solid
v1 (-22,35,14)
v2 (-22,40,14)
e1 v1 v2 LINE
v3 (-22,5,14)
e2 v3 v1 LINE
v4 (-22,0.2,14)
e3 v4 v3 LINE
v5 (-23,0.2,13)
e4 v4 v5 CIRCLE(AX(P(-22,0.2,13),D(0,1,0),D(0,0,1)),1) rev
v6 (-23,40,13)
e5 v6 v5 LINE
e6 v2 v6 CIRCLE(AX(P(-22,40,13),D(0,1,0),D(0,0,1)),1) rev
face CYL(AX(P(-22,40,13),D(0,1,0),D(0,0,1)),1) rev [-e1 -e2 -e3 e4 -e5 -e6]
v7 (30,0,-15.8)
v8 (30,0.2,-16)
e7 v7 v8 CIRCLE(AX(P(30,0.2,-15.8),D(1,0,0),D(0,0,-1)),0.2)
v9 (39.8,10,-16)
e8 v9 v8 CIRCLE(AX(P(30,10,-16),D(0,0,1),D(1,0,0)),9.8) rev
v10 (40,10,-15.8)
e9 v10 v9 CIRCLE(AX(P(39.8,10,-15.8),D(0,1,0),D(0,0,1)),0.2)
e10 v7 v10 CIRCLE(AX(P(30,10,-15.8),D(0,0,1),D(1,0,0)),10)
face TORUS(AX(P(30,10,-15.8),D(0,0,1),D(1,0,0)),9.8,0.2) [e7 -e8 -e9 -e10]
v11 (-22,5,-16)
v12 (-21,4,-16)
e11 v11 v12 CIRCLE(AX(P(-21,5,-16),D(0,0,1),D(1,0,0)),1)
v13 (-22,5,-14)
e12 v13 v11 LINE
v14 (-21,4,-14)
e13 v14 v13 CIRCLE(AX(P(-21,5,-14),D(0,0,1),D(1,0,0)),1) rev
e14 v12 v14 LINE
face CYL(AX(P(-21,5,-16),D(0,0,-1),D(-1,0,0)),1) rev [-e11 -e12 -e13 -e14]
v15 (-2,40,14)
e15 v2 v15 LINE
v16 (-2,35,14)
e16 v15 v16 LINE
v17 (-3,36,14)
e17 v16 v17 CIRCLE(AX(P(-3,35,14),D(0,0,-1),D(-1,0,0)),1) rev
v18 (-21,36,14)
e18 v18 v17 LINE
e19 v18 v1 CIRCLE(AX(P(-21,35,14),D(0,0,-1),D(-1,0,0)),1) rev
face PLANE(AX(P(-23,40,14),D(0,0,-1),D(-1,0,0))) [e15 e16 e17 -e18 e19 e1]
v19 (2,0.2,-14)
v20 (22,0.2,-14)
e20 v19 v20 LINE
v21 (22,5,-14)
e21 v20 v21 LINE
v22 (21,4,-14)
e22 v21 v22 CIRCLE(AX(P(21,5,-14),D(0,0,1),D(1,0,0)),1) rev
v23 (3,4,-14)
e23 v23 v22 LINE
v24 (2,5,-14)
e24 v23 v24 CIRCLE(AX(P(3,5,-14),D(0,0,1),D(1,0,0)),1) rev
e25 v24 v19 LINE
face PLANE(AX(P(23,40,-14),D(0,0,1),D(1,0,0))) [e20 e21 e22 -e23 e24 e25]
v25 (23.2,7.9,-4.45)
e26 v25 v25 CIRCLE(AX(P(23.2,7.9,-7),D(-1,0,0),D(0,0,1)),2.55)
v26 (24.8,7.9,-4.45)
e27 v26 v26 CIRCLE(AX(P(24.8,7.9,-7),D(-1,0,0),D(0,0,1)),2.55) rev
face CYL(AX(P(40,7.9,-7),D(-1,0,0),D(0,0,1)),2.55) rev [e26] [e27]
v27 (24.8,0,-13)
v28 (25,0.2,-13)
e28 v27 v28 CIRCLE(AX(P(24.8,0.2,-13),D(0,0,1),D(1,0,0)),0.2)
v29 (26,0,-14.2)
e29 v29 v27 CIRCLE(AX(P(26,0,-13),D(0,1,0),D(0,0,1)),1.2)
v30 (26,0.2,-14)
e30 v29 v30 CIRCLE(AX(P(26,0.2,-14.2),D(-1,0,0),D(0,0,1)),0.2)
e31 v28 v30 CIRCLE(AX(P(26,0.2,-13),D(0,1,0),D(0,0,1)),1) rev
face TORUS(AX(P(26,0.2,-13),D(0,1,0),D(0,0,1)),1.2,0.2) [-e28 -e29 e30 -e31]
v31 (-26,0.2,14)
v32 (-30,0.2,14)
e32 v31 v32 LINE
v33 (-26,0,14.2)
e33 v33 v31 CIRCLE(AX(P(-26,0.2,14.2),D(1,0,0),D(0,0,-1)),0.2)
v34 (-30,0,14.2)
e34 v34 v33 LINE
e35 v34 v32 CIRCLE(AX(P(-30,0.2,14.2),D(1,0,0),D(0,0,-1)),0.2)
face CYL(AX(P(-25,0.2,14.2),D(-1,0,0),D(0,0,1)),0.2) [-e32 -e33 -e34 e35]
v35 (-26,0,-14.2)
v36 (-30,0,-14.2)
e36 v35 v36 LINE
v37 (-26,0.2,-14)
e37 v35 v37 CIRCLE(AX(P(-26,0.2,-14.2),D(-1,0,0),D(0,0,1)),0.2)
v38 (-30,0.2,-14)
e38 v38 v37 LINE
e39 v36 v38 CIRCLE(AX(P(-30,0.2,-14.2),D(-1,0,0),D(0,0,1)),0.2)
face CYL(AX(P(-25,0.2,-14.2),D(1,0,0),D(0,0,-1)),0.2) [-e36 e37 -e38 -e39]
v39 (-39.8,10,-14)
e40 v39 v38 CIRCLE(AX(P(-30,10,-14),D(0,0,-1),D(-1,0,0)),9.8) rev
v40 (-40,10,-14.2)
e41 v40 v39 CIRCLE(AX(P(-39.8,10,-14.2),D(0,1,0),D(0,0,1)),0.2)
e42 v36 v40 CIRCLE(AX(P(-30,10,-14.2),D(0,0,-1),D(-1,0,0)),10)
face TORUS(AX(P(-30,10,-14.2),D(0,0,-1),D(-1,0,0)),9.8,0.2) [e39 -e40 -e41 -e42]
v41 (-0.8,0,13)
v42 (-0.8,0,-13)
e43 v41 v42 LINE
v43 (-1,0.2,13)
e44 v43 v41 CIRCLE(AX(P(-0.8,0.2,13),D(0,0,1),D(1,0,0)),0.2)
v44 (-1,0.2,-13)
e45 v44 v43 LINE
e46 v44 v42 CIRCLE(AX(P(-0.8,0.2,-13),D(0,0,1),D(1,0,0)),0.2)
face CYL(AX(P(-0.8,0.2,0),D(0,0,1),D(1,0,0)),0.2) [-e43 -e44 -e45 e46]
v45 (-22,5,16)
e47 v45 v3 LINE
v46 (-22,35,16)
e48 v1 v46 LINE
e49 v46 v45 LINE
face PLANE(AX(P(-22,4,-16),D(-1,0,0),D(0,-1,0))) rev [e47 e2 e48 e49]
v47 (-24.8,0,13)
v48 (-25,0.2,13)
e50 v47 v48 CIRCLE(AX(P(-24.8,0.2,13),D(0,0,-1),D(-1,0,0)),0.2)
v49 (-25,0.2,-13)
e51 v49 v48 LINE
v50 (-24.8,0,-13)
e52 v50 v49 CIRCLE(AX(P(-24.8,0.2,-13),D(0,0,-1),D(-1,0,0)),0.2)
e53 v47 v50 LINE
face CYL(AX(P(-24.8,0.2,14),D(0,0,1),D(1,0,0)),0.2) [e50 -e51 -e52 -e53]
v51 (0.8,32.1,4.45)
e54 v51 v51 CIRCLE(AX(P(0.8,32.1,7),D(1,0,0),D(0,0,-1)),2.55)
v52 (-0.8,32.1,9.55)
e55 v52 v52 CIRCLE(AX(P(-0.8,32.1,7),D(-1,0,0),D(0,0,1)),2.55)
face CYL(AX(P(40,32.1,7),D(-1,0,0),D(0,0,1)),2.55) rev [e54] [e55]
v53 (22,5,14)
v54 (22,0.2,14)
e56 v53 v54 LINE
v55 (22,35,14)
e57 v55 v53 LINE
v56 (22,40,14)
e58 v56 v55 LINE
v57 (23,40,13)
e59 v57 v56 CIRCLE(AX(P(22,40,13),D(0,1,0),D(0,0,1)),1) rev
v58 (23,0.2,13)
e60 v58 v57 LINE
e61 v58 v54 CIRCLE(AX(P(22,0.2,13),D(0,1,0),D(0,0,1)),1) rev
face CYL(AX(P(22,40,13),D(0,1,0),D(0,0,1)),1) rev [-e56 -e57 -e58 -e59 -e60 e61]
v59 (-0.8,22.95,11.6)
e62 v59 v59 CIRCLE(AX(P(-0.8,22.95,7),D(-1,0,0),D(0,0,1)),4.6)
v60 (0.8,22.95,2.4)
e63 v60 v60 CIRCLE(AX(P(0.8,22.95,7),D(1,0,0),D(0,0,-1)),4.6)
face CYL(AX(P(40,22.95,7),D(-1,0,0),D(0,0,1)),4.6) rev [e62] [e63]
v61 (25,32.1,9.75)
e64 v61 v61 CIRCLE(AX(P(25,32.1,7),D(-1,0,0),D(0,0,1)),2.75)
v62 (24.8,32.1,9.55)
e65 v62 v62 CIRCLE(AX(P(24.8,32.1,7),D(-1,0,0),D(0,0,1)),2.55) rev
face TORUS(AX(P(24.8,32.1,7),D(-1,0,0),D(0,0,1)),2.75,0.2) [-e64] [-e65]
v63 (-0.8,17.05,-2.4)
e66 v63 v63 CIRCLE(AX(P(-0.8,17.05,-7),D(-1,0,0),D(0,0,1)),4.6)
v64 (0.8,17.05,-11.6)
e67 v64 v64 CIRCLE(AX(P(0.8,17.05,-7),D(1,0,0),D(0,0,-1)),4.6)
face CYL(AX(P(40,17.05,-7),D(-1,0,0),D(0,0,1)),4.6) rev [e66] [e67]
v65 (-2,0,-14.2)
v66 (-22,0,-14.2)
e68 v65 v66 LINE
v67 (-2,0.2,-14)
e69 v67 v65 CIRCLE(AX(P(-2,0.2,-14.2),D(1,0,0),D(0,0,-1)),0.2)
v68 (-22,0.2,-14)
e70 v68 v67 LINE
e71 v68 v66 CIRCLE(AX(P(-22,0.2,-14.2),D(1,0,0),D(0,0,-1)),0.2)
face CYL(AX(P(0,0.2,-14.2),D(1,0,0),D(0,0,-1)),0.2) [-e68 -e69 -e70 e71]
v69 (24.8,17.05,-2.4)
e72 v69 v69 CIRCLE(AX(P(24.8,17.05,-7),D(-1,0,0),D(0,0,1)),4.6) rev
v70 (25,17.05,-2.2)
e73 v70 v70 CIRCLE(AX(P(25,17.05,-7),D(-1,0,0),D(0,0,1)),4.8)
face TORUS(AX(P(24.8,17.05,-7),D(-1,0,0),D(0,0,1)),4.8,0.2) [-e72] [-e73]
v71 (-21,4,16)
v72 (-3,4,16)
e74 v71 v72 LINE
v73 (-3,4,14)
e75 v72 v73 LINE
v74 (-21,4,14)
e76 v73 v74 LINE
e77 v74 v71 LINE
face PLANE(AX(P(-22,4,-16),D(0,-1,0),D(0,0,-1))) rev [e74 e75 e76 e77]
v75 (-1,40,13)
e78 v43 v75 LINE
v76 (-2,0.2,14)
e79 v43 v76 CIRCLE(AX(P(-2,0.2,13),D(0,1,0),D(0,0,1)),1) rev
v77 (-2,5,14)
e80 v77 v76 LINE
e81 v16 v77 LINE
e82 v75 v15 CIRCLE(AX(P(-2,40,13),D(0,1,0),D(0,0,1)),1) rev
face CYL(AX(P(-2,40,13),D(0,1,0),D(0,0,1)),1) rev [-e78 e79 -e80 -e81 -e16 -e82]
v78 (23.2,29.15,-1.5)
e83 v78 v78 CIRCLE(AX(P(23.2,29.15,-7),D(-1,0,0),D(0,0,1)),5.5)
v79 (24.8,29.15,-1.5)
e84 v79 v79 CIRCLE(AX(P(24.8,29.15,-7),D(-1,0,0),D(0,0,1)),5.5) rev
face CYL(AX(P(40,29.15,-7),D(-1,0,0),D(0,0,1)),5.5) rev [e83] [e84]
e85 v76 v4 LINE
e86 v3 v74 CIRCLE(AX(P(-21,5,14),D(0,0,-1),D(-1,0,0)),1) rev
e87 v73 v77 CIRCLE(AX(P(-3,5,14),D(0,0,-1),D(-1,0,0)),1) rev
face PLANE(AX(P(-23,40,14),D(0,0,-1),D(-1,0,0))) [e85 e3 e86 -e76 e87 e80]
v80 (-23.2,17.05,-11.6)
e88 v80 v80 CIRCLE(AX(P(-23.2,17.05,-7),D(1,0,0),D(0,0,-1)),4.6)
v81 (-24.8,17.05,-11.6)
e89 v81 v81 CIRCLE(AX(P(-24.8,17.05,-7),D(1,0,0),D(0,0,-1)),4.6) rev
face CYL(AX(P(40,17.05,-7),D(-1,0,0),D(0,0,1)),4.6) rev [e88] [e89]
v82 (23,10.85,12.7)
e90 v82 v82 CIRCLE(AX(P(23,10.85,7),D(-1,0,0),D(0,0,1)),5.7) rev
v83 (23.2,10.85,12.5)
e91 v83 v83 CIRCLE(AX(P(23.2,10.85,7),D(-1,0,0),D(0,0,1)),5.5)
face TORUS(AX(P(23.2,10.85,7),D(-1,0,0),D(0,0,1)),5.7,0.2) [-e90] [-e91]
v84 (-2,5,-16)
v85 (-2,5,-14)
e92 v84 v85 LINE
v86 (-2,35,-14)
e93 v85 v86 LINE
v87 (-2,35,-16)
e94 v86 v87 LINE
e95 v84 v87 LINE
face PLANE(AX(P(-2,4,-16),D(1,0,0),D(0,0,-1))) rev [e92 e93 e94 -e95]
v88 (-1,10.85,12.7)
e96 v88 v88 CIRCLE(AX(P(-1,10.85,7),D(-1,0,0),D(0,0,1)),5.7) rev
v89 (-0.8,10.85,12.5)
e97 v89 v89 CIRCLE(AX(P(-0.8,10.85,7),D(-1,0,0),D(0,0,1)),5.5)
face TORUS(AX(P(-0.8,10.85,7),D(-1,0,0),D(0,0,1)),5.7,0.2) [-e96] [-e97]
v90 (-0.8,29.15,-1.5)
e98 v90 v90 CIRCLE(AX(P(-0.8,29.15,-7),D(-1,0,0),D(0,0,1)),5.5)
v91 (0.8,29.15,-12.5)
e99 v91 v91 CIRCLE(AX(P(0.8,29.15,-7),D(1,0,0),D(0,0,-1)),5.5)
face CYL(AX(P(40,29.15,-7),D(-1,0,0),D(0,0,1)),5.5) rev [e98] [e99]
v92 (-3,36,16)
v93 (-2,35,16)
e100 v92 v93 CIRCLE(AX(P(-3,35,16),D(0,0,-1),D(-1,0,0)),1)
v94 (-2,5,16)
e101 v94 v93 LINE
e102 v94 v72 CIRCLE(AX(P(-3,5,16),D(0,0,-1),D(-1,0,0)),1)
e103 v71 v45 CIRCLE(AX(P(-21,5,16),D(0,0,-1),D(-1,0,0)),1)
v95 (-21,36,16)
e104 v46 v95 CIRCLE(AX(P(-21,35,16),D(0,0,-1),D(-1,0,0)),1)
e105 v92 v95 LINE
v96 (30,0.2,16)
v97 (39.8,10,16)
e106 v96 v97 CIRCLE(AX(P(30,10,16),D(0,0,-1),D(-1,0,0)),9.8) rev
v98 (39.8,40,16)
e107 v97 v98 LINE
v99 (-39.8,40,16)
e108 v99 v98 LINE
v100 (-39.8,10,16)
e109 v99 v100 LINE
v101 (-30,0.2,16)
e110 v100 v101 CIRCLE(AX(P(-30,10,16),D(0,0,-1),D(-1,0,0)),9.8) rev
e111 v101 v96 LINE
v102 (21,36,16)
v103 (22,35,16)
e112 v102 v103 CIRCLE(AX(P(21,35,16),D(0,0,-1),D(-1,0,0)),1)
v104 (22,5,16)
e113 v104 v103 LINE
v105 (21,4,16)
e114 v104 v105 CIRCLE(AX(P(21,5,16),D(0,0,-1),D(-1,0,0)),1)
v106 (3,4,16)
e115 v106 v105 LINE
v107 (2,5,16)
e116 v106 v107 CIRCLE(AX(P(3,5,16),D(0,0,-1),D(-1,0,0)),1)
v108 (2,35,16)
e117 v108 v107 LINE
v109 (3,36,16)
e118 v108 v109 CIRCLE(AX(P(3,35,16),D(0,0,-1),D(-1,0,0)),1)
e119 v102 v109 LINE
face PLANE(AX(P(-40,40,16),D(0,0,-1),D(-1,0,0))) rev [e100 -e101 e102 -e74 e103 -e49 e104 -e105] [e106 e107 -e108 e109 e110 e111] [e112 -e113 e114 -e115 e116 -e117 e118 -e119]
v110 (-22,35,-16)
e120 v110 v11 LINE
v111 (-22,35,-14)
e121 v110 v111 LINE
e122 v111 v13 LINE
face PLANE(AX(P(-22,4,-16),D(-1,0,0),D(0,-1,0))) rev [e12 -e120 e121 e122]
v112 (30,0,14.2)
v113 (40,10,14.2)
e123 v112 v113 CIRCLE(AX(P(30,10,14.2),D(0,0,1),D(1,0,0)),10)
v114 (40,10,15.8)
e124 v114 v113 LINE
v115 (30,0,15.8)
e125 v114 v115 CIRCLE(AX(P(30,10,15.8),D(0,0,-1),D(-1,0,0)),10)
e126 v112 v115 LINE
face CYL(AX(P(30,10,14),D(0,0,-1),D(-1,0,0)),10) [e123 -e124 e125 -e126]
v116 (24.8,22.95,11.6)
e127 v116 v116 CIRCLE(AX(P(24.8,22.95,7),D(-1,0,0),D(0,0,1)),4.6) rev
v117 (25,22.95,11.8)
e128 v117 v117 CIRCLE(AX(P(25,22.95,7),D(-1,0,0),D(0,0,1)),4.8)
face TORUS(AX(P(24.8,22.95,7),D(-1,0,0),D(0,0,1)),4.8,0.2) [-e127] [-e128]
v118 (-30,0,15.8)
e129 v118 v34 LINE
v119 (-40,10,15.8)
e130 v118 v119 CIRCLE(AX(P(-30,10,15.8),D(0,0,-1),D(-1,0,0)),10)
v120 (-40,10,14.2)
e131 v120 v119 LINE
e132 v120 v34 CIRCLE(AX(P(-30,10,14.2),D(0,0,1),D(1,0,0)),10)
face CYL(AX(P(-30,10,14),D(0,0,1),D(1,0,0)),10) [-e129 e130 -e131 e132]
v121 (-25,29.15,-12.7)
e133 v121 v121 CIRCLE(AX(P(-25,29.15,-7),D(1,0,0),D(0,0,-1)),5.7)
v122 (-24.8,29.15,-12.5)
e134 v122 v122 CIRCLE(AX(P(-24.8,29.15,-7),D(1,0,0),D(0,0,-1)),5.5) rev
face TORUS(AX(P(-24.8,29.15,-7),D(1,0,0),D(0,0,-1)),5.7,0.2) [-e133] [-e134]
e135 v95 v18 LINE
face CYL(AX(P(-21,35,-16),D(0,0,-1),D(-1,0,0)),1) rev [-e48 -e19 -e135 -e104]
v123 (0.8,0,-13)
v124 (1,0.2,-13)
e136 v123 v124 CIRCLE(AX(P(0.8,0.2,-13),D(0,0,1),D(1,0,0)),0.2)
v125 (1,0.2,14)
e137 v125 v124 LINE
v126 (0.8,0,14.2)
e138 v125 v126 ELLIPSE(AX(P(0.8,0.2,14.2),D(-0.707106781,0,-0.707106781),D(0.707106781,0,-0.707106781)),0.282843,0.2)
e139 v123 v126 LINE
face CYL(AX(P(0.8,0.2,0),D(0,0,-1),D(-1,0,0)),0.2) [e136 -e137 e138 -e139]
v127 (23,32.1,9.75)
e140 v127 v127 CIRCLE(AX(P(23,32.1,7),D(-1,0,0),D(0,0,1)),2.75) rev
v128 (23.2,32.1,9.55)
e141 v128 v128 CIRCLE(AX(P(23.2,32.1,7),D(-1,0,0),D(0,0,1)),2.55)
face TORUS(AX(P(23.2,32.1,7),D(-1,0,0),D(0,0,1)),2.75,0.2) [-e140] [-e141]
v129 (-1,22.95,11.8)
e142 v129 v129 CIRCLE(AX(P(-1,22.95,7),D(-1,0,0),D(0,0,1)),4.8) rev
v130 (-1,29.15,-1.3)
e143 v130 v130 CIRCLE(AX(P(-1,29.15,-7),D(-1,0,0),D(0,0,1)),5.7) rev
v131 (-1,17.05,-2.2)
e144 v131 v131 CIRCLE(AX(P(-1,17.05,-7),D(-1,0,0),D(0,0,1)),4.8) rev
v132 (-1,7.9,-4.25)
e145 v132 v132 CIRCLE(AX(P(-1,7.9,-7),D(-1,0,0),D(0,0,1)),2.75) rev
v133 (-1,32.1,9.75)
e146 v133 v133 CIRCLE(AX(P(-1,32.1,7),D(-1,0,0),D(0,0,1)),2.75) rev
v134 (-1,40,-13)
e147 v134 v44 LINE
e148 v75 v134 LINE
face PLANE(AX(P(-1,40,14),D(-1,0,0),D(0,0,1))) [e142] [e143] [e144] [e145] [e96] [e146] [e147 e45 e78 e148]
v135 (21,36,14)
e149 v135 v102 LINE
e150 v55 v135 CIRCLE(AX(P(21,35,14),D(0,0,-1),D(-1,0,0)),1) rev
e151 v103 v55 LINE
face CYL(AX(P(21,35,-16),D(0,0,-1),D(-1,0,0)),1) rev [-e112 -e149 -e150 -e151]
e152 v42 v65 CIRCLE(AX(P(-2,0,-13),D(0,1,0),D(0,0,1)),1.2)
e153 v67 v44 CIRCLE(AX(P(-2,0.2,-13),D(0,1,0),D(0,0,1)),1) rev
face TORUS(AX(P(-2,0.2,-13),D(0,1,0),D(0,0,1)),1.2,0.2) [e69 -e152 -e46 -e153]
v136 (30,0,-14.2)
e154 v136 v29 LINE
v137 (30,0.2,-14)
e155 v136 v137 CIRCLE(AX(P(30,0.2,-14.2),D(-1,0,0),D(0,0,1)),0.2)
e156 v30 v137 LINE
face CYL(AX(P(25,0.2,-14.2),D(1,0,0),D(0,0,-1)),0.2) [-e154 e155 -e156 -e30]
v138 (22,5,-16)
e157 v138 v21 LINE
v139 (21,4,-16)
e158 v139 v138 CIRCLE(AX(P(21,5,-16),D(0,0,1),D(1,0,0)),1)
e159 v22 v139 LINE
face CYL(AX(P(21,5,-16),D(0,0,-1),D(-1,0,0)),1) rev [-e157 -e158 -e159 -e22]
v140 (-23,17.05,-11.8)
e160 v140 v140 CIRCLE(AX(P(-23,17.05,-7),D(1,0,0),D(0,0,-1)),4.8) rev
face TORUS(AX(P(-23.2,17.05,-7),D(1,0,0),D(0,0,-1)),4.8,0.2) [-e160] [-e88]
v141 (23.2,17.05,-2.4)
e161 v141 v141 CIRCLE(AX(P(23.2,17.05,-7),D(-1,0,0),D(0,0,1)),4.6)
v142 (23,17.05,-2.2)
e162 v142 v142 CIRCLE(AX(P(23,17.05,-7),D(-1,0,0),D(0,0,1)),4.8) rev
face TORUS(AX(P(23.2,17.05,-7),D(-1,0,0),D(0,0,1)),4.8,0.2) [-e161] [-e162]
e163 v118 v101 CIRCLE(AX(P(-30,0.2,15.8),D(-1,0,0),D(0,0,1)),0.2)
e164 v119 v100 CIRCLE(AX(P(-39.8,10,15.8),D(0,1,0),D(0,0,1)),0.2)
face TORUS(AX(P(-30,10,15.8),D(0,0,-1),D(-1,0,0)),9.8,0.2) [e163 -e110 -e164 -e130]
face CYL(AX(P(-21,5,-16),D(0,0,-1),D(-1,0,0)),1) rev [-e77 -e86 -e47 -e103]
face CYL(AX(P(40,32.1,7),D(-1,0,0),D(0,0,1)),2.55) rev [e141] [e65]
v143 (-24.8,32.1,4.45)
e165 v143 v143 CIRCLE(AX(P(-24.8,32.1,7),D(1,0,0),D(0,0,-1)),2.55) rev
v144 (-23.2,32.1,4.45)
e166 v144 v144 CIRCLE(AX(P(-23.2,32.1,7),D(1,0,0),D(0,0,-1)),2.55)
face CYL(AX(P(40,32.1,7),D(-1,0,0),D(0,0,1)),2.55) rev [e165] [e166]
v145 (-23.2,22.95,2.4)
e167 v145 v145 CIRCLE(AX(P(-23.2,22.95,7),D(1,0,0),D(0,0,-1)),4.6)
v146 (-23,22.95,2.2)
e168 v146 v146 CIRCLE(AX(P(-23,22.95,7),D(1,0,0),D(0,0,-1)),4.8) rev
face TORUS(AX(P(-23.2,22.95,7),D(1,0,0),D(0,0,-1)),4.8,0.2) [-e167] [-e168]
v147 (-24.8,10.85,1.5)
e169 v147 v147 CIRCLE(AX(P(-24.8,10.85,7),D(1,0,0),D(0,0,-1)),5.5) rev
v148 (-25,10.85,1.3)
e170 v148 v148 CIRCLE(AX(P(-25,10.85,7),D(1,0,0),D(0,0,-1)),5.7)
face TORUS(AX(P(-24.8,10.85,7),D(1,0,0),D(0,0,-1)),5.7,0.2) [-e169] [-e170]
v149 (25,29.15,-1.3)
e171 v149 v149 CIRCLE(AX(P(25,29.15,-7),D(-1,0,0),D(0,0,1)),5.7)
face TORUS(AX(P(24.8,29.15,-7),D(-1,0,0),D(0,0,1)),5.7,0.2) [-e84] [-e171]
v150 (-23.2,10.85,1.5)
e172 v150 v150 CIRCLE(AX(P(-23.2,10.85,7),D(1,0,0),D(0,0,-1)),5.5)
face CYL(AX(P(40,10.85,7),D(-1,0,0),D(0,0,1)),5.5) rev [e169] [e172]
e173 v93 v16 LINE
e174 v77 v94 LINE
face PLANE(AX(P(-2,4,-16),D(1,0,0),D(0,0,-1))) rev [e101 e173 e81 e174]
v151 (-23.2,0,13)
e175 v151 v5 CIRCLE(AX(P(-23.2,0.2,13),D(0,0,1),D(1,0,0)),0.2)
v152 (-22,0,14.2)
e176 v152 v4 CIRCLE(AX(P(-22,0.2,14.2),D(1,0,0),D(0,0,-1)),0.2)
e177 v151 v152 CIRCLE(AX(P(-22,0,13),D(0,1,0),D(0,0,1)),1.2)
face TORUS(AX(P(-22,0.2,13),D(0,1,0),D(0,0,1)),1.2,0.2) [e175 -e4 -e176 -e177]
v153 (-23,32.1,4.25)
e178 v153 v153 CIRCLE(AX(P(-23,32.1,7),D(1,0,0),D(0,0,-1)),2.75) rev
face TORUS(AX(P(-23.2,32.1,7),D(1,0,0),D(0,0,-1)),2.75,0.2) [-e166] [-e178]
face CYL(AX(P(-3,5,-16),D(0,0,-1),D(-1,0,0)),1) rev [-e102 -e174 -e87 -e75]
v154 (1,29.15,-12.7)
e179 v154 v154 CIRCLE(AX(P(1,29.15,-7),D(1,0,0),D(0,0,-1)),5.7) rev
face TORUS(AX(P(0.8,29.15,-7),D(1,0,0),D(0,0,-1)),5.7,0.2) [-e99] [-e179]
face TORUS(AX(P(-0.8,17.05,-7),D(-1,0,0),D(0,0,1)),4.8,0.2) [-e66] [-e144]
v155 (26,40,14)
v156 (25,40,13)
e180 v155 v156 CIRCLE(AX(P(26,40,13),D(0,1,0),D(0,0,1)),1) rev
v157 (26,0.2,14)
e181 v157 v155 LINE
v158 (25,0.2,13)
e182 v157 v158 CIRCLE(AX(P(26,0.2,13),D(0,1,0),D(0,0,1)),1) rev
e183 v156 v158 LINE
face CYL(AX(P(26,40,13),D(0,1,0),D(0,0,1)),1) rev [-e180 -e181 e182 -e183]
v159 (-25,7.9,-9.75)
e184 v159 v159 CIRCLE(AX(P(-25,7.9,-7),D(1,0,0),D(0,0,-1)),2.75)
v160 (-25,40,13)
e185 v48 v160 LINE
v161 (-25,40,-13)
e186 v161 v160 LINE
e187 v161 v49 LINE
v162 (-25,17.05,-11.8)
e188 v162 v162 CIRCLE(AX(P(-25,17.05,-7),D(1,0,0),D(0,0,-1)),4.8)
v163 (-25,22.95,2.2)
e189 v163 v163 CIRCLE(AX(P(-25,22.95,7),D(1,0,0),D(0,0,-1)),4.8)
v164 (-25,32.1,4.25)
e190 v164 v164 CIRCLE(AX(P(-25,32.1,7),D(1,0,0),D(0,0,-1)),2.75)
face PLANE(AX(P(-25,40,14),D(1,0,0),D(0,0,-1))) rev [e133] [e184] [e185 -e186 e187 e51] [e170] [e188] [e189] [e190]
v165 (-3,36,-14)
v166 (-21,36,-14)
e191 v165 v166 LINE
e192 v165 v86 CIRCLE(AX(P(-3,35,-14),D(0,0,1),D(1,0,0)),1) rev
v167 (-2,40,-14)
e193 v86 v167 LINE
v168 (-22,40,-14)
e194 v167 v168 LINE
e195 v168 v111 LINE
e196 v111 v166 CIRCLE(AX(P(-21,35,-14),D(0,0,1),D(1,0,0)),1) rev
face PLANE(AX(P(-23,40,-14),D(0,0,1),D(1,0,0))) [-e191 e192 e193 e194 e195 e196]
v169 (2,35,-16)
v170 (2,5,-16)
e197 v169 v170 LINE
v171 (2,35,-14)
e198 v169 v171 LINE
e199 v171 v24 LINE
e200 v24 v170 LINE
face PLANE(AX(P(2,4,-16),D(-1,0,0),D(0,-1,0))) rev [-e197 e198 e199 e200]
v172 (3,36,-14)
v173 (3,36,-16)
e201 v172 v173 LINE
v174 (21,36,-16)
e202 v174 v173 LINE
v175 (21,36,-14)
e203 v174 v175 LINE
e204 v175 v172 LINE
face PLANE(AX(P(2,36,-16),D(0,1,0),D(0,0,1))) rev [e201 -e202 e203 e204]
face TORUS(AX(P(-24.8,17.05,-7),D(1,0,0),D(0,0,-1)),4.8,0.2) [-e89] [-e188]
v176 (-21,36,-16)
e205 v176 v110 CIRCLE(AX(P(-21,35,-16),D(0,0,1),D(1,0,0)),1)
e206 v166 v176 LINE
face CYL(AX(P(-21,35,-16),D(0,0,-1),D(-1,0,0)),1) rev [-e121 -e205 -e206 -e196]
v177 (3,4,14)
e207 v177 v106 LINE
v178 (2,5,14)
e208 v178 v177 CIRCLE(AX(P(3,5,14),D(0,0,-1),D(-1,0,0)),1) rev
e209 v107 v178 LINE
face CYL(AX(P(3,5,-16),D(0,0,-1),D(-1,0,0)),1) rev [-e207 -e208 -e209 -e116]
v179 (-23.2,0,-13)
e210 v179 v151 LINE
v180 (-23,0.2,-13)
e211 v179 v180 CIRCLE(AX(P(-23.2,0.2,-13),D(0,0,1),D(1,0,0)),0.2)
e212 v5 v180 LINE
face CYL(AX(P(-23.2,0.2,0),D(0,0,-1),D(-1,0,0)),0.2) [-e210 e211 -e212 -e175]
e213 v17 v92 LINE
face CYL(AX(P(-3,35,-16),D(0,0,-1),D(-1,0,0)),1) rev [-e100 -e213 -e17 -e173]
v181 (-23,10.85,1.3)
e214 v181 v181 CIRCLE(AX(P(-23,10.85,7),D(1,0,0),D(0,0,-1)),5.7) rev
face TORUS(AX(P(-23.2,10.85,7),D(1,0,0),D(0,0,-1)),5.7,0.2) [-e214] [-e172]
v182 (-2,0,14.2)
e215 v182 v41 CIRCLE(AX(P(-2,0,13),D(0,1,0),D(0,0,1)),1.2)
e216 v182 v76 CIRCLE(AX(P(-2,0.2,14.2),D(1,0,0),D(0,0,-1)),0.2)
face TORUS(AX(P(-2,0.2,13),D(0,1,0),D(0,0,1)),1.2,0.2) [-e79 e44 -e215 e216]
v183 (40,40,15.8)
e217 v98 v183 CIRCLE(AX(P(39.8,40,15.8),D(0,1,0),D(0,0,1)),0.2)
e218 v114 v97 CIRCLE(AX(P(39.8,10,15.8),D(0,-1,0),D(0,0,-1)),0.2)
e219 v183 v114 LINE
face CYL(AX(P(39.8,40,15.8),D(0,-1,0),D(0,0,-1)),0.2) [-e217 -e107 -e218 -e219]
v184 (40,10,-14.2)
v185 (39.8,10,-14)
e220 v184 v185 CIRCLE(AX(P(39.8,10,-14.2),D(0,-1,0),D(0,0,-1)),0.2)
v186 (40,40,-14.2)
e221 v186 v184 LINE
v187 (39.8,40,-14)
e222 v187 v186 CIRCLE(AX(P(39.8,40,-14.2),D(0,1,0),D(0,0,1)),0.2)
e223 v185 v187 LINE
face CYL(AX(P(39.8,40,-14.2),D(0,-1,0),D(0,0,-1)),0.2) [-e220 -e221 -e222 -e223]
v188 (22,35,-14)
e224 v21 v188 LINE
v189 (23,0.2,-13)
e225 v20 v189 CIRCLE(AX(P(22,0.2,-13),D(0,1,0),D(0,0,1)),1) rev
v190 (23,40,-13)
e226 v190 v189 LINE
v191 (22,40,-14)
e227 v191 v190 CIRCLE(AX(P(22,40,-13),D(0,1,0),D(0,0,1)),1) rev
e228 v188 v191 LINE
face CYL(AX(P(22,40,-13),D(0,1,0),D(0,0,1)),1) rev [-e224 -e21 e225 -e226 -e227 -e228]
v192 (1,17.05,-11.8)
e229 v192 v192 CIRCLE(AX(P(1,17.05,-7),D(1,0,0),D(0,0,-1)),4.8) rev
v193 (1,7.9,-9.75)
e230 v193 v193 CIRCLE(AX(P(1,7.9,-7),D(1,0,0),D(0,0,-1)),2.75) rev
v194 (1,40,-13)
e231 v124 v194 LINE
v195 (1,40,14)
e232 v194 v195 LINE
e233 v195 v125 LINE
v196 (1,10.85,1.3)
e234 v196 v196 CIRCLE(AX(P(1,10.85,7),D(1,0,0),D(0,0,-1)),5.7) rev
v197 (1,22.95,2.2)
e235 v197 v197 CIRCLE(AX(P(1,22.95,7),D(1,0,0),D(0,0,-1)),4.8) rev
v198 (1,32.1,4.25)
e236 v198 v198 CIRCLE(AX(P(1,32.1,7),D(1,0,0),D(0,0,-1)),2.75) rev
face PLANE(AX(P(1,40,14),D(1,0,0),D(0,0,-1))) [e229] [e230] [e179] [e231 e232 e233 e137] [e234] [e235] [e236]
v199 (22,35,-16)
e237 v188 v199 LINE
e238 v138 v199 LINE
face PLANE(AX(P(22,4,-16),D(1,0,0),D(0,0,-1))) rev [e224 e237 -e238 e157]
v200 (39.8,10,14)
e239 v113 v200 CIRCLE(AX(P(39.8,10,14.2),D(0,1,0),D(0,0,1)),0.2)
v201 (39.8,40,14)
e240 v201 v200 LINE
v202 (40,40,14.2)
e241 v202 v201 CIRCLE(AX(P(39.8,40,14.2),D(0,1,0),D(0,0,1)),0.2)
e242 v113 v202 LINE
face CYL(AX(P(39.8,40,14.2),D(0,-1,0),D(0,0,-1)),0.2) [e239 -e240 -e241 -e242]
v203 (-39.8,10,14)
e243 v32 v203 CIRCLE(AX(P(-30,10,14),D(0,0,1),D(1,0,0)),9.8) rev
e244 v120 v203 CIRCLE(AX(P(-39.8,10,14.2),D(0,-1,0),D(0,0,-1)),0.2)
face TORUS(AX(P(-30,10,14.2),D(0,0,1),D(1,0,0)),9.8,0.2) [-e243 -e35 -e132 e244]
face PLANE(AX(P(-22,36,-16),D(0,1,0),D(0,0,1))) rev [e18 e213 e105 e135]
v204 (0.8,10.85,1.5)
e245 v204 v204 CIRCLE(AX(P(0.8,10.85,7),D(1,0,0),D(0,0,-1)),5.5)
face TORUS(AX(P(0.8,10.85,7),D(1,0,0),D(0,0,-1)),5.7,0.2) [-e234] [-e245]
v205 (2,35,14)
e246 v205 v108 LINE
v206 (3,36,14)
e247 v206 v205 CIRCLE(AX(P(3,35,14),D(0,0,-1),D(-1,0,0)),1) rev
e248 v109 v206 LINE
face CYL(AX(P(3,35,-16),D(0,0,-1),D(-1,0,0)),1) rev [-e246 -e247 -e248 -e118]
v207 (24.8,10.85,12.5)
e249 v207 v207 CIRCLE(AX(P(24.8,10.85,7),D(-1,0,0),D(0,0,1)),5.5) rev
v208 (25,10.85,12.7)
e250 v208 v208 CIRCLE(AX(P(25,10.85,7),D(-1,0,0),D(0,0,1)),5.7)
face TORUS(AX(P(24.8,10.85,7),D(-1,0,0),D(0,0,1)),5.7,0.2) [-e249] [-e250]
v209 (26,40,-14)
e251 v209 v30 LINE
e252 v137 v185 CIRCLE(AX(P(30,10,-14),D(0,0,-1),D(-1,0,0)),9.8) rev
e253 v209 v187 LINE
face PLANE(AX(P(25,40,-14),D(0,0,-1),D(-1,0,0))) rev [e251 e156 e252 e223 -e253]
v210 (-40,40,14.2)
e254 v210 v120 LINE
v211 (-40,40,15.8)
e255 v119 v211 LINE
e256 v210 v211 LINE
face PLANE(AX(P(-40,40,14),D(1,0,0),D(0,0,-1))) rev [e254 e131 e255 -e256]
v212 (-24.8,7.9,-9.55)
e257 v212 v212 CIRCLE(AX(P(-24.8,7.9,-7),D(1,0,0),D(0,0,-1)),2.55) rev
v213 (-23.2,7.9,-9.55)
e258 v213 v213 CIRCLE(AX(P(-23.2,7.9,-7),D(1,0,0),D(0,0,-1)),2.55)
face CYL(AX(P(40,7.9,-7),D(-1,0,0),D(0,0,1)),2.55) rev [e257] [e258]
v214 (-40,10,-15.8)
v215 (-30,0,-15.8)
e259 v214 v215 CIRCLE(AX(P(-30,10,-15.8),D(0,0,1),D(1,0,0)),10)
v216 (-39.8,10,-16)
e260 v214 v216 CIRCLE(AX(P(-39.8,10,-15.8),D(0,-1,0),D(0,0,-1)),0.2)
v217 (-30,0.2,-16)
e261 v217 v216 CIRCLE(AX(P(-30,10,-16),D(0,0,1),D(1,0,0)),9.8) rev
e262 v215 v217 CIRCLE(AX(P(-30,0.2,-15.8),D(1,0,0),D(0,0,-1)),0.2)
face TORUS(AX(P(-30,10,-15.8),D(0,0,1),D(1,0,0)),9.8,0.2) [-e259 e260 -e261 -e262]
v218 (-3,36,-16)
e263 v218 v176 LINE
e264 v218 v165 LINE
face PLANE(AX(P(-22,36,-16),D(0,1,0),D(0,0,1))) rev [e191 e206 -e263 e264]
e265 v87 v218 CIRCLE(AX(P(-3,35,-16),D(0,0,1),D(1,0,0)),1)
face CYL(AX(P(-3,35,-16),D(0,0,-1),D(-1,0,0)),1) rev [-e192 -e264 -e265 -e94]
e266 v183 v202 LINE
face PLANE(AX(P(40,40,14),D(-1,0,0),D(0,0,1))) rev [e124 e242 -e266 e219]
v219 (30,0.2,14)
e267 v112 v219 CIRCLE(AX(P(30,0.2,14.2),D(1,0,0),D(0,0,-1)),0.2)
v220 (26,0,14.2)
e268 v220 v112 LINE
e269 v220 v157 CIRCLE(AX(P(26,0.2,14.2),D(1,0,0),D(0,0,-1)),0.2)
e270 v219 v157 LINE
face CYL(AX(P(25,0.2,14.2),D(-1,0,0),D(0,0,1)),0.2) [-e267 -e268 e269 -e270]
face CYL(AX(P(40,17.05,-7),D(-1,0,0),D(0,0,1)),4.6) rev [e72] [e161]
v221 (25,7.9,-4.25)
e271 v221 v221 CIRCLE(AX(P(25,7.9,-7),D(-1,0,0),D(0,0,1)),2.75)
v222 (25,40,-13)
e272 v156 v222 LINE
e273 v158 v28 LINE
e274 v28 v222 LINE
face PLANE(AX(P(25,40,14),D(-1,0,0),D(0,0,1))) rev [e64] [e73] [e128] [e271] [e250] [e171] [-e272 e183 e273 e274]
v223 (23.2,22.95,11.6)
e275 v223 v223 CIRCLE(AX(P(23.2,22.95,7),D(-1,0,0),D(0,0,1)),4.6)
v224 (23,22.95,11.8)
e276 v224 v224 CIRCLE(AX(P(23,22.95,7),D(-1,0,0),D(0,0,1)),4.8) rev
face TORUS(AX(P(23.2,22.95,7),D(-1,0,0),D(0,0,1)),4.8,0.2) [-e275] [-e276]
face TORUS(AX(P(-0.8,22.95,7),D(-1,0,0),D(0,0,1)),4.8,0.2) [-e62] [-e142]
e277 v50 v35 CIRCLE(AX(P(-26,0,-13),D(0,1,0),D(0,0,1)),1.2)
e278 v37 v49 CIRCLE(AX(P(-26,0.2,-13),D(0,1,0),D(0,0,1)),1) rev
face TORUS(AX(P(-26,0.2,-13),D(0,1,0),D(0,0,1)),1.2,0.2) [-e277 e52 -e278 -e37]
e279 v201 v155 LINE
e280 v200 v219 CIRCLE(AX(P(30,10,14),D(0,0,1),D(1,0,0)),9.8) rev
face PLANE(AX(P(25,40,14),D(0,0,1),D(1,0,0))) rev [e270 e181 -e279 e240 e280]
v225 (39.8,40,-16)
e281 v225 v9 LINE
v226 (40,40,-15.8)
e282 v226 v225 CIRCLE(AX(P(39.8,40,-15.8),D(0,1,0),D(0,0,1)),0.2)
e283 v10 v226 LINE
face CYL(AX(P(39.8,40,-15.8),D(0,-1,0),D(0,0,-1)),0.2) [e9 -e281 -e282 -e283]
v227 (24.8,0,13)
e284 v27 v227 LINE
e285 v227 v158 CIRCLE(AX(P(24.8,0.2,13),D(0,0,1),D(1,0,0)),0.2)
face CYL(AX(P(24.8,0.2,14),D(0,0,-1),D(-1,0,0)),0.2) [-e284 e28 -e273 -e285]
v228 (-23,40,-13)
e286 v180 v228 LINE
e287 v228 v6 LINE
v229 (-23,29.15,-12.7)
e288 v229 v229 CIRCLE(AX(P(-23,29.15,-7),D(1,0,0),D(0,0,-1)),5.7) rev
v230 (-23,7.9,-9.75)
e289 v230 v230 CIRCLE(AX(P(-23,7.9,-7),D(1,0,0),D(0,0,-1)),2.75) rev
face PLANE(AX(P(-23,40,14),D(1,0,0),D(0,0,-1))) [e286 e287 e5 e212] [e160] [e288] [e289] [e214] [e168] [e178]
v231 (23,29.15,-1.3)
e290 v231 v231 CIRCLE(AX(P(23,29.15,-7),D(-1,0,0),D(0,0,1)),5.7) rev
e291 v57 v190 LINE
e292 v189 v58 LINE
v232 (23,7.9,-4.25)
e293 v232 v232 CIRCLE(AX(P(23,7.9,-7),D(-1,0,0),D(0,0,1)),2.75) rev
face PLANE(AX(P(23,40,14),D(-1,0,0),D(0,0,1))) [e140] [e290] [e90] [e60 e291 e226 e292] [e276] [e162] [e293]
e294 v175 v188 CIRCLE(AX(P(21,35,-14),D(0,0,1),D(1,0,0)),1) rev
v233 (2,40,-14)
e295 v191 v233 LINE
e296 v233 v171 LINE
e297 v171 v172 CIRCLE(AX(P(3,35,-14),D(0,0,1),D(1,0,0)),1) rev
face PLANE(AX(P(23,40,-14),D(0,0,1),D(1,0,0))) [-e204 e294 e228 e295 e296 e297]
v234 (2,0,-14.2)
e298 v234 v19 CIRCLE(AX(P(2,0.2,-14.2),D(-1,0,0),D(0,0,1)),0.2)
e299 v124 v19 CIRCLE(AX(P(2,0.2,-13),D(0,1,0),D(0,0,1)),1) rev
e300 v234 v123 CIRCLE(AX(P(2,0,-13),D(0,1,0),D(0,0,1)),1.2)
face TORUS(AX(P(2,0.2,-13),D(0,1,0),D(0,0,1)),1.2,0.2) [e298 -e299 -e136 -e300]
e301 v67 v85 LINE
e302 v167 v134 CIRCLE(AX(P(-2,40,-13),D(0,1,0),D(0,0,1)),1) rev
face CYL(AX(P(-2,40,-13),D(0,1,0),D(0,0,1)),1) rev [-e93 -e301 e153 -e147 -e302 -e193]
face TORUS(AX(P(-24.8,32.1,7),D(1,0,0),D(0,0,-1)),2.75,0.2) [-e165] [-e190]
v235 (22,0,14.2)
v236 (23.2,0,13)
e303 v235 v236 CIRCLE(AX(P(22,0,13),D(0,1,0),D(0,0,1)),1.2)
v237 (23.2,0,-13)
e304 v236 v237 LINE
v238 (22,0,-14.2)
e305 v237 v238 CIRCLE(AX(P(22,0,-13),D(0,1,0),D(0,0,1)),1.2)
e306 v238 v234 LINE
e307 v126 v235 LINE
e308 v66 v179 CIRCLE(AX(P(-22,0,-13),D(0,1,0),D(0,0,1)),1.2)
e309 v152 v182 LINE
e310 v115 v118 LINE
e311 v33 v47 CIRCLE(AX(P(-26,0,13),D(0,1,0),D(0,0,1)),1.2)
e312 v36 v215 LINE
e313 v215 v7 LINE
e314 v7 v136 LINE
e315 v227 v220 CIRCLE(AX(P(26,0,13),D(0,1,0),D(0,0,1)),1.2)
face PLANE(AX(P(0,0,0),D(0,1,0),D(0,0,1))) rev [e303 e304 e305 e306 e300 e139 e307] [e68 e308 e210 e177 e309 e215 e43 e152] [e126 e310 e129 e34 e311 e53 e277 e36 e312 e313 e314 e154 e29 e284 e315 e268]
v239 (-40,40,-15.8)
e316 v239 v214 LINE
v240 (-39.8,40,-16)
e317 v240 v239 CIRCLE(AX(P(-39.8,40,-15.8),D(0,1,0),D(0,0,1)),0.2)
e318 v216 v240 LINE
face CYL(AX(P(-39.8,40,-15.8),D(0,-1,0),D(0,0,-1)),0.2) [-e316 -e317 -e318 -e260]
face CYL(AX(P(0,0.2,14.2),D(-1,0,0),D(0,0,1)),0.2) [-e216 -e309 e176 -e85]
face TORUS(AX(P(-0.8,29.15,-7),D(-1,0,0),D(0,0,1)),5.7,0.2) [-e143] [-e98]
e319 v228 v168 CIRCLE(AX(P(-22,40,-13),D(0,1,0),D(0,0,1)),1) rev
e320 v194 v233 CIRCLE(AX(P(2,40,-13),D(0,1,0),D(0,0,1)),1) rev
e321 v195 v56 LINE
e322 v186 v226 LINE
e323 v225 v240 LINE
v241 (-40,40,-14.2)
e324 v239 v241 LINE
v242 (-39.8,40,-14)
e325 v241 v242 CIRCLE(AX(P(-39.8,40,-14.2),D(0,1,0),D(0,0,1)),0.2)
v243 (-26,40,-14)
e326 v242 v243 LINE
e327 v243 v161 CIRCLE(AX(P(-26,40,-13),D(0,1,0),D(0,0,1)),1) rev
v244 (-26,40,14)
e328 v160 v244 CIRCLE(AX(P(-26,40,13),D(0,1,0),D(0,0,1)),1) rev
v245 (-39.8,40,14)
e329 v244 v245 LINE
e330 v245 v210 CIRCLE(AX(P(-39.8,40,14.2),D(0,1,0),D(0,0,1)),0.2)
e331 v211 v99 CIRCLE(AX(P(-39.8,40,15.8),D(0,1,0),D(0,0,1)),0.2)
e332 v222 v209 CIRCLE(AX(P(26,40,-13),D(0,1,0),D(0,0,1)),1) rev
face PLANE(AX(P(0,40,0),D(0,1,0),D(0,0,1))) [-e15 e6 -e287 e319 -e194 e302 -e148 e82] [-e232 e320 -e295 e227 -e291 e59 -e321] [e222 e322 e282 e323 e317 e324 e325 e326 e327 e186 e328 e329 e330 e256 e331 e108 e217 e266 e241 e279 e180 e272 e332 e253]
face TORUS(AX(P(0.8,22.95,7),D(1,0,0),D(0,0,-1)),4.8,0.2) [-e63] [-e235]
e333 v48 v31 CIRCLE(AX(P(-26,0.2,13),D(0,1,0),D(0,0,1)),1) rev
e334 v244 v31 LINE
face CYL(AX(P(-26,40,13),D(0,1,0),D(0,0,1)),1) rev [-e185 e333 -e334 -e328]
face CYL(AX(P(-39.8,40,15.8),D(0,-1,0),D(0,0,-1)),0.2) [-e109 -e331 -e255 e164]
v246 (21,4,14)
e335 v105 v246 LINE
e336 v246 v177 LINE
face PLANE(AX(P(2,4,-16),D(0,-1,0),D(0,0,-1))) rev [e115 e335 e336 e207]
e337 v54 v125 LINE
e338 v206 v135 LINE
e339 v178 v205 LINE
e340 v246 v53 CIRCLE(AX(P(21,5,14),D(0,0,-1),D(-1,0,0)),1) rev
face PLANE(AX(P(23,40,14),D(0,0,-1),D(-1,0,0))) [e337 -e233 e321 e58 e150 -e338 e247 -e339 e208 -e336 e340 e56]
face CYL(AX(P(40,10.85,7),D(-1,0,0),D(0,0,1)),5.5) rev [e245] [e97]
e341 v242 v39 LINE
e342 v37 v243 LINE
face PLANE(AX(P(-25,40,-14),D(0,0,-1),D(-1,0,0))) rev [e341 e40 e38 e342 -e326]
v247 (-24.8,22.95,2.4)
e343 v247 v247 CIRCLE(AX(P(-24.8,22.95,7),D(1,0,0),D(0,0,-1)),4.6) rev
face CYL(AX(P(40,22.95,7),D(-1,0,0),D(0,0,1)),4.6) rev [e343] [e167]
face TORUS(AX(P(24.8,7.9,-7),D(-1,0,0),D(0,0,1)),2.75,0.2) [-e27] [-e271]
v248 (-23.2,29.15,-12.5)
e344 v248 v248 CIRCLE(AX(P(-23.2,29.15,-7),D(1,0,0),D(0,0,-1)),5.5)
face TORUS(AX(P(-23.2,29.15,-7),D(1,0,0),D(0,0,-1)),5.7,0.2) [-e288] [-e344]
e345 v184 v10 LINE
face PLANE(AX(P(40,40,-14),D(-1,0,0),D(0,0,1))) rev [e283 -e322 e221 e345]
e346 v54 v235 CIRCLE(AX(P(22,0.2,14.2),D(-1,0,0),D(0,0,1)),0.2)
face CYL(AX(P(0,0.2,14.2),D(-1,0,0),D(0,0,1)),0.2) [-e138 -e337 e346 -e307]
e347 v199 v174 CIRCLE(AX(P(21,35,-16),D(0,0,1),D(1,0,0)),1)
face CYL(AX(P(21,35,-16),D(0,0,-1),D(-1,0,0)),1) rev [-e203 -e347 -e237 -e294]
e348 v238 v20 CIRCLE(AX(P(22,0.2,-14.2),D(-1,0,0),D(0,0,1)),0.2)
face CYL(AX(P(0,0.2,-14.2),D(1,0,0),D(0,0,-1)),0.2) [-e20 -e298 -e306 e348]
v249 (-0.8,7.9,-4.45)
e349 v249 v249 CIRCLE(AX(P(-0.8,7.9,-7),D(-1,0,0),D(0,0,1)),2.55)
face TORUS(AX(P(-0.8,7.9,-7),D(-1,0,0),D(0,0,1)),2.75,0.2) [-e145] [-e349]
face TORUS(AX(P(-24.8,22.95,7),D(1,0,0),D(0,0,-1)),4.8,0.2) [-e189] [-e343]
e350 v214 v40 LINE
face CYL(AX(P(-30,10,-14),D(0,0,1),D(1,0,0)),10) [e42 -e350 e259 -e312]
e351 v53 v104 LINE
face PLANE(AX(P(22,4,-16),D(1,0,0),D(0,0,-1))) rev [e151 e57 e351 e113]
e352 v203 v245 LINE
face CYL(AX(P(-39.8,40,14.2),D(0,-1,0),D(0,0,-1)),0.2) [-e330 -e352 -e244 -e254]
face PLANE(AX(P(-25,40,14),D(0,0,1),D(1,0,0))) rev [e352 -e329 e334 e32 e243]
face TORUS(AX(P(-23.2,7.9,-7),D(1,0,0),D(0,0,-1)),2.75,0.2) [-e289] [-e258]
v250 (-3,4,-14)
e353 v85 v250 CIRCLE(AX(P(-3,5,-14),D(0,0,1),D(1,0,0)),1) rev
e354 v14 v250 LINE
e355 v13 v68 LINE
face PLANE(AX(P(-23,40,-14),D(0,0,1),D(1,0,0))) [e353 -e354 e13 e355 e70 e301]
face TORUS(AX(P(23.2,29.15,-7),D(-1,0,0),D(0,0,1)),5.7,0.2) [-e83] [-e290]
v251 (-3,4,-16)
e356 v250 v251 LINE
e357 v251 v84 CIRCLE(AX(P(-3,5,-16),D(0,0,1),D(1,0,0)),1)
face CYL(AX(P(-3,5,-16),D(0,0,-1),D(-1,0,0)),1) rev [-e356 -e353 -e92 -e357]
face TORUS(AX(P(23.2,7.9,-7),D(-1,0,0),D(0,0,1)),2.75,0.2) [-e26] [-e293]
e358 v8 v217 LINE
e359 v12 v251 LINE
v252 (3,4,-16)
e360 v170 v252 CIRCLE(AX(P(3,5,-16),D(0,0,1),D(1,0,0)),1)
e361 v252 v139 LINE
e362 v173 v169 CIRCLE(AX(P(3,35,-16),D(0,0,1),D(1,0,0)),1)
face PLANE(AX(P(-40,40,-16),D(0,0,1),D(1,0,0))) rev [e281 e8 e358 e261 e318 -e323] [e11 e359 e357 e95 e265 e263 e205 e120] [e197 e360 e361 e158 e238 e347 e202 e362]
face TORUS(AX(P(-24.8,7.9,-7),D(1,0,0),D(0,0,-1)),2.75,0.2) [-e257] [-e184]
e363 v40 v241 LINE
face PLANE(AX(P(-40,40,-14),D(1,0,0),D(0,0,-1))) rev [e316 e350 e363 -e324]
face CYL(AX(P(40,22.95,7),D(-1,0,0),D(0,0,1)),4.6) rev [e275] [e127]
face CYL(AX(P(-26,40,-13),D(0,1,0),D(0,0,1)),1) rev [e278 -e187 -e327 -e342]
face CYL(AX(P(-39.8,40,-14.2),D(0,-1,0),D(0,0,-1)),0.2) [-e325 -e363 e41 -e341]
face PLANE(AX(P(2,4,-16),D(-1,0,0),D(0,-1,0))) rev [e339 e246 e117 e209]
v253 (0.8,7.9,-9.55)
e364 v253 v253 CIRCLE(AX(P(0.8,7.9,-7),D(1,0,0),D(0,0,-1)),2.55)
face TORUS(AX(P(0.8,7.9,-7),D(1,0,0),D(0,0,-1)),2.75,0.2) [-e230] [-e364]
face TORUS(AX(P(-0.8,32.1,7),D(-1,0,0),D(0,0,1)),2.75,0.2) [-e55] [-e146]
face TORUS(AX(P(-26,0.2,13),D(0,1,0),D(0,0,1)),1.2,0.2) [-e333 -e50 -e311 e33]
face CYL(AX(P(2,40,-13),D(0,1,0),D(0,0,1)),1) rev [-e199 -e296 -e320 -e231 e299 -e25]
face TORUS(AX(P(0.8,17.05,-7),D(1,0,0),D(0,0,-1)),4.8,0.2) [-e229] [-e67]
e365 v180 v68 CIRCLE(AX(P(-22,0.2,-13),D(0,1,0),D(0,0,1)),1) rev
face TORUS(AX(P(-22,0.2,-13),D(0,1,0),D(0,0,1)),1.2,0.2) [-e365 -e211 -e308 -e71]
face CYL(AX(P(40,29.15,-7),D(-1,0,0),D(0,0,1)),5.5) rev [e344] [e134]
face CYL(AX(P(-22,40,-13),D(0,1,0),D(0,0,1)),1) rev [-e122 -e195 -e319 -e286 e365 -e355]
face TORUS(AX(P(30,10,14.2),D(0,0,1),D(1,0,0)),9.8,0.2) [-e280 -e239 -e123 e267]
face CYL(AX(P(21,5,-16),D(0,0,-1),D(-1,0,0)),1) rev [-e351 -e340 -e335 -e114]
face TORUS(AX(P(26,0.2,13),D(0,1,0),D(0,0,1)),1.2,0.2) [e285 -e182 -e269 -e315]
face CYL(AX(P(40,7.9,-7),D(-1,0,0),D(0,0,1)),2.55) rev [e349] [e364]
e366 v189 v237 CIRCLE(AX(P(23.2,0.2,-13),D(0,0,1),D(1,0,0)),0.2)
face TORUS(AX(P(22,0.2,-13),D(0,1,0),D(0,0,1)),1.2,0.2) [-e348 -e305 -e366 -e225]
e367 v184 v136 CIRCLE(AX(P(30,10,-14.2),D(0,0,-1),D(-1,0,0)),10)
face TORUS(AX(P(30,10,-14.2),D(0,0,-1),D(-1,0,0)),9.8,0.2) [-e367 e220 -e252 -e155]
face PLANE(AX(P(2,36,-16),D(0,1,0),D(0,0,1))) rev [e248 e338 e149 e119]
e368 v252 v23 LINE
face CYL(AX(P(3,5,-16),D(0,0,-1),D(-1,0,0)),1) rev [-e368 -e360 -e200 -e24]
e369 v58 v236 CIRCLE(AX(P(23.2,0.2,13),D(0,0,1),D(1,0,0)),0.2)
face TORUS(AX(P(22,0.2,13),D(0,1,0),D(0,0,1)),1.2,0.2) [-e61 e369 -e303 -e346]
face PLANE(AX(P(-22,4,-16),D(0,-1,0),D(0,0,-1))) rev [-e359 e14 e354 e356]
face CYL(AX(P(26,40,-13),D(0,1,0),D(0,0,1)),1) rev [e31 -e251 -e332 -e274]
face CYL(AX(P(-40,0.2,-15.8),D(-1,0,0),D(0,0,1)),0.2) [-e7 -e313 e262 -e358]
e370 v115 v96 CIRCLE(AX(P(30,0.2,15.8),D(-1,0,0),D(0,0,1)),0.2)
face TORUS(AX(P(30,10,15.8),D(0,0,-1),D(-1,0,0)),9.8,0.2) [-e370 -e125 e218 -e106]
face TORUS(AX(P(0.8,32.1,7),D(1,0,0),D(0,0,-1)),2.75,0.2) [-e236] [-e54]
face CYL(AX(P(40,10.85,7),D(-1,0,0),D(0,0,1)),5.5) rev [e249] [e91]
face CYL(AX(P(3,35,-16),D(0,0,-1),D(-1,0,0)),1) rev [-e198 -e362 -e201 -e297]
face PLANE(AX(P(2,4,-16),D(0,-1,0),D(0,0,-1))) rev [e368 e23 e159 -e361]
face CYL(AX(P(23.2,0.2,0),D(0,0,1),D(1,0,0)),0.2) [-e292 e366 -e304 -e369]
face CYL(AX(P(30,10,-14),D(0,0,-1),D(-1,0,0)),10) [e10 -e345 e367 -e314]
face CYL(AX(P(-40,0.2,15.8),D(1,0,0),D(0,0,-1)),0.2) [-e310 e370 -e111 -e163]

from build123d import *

# Parameters (mm, degrees)
SKIZZE1_W                            = 22
SKIZZE1_H                            = 28
AUFSATZ_LINEAR_AUSTRAGEN1_DEPTH      = 40
SKIZZE2_R                            = 5.5
SKIZZE2_R_2                          = 4.6
SKIZZE2_R_3                          = 2.55
SCHNITT_LINEAR_AUSTRAGEN1_DEPTH      = 78.98076686
SCHNITT_LINEAR_AUSTRAGEN2_DEPTH      = 65.031242374
SCHNITT_LINEAR_AUSTRAGEN2_DEPTH_BACK = 65.031242374
SKIZZE3_W                            = 20
SKIZZE3_H                            = 32
VERRUNDUNG1_R                        = 10
VERRUNDUNG2_R                        = 1
VERRUNDUNG3_R                        = 1
VERRUNDUNG4_R                        = 0.2
VERRUNDUNG5_R                        = 0.2


with BuildPart() as part:
    # Skizze1 → Aufsatz-Linear austragen1 (new body)
    with BuildSketch(Plane(origin=(0, 0, 0), x_dir=(1, 0, 0), z_dir=(0, 1, 0))):
        Polygon((-25, -14), (-25, 14), (-40, 14), (-40, 16), (40, 16), (40, 14), (25, 14), (25, -14), (40, -14), (40, -16), (-40, -16), (-40, -14), align=None)
        with Locations((-12, 0)):
            Rectangle(SKIZZE1_W, SKIZZE1_H, mode=Mode.SUBTRACT)
        with Locations((12, 0)):
            Rectangle(SKIZZE1_W, SKIZZE1_H, mode=Mode.SUBTRACT)
    extrude(amount=AUFSATZ_LINEAR_AUSTRAGEN1_DEPTH)

    # Skizze2 → Schnitt-Linear austragen1 (cut, through all)
    with BuildSketch(Plane.ZY.offset(25)):
        with Locations((-7, 29.15)):
            Circle(SKIZZE2_R)
        with Locations((-7, 17.05)):
            Circle(SKIZZE2_R_2)
        with Locations((-7, 7.9)):
            Circle(SKIZZE2_R_3)
        with Locations((7, 32.1)):
            Circle(SKIZZE2_R_3)
        with Locations((7, 22.95)):
            Circle(SKIZZE2_R_2)
        with Locations((7, 10.85)):
            Circle(SKIZZE2_R)
    extrude(amount=-SCHNITT_LINEAR_AUSTRAGEN1_DEPTH, mode=Mode.SUBTRACT)

    # Skizze3 → Schnitt-Linear austragen2 (cut, two sides: drawn at the far end of the back side and taken through both)
    with BuildSketch(Plane.XY.offset(-14).offset(-SCHNITT_LINEAR_AUSTRAGEN2_DEPTH_BACK)):
        with Locations((-12, 20)):
            Rectangle(SKIZZE3_W, SKIZZE3_H)
        with Locations((12, 20)):
            Rectangle(SKIZZE3_W, SKIZZE3_H)
    extrude(amount=SCHNITT_LINEAR_AUSTRAGEN2_DEPTH + SCHNITT_LINEAR_AUSTRAGEN2_DEPTH_BACK, mode=Mode.SUBTRACT)

    # Verrundung1
    verrundung1_edges = [part.edges().sort_by_distance(p)[0] for p in [
        (40, 0, -15),
        (40, 0, 15),
        (-40, 0, 15),
        (-40, 0, -15),
    ]]
    fillet(verrundung1_edges, radius=VERRUNDUNG1_R)

    # Verrundung2
    verrundung2_edges = [part.edges().sort_by_distance(p)[0] for p in [
        (25, 20, -14),
        (25, 20, 14),
        (-25, 20, 14),
        (-25, 20, -14),
        (-1, 20, -14),
        (-23, 20, -14),
        (-23, 20, 14),
        (-1, 20, 14),
        (23, 20, 14),
        (23, 20, -14),
        (1, 20, -14),
    ]]
    fillet(verrundung2_edges, radius=VERRUNDUNG2_R - 0.0001)  # a hair under: the kernel refuses the full size

    # Verrundung3
    verrundung3_edges = [part.edges().sort_by_distance(p)[0] for p in [
        (-2, 36, -15),
        (-2, 4, -15),
        (-22, 4, -15),
        (-22, 36, -15),
        (-2, 36, 15),
        (-2, 4, 15),
        (-22, 4, 15),
        (-22, 36, 15),
        (22, 36, -15),
        (22, 4, -15),
        (2, 4, -15),
        (2, 36, -15),
        (22, 36, 15),
        (22, 4, 15),
        (2, 4, 15),
        (2, 36, 15),
    ]]
    fillet(verrundung3_edges, radius=VERRUNDUNG3_R)

    # Verrundung4
    verrundung4_edges = [part.edges().sort_by_distance(p)[0] for p in [
        (0, 0, -16),
        (-37.071067812, 2.928932188, -16),
        (37.071067812, 2.928932188, -16),
        (27.99995, 0, 14),
        (0, 0, 16),
        (-27.99995, 0, -14),
        (37.071067812, 2.928932188, -14),
        (37.071067812, 2.928932188, 14),
        (-37.071067812, 2.928932188, 16),
        (37.071067812, 2.928932188, 16),
        (-37.071067812, 2.928932188, 14),
        (-37.071067812, 2.928932188, -14),
        (40, 25, -16),
        (40, 25, -14),
        (40, 25, 14),
        (40, 25, 16),
        (-40, 25, 16),
        (25, 0, 0),
        (-40, 25, 14),
        (27.99995, 0, -14),
        (-40, 25, -14),
        (12, 0, -14),
        (-40, 25, -16),
        (1, 0, 0.49995),
        (-12, 0, -14),
        (-23, 0, 0),
        (-12, 0, 14),
        (-25, 0, 0),
        (-27.99995, 0, 14),
        (-1, 0, 0),
        (23, 0, 0),
        (25.292863929, 0, 13.707136071),
        (25.292863929, 0, -13.707136071),
        (1.292863929, 0, -13.707136071),
        (-22.707136071, 0, -13.707136071),
        (-22.707136071, 0, 13.707136071),
        (-25.292863929, 0, -13.707136071),
        (-25.292863929, 0, 13.707136071),
        (-1.292863929, 0, 13.707136071),
        (-1.292863929, 0, -13.707136071),
        (22.707136071, 0, -13.707136071),
        (22.707136071, 0, 13.707136071),
        (11.50005, 0, 14),
    ]]
    fillet(verrundung4_edges, radius=VERRUNDUNG4_R)

    # Verrundung5
    verrundung5_edges = [part.edges().sort_by_distance(p)[0] for p in [
        (25, 10.85, 1.5),
        (-1, 10.85, 1.5),
        (-23, 10.85, 1.5),
        (1, 10.85, 1.5),
        (23, 10.85, 1.5),
        (-25, 10.85, 1.5),
        (25, 29.15, -12.5),
        (-1, 29.15, -12.5),
        (-23, 29.15, -12.5),
        (1, 29.15, -12.5),
        (23, 29.15, -12.5),
        (-25, 29.15, -12.5),
        (25, 17.05, -11.6),
        (-1, 17.05, -11.6),
        (-23, 17.05, -11.6),
        (1, 17.05, -11.6),
        (23, 17.05, -11.6),
        (-25, 17.05, -11.6),
        (25, 7.9, -9.55),
        (-1, 7.9, -9.55),
        (-23, 7.9, -9.55),
        (1, 7.9, -9.55),
        (23, 7.9, -9.55),
        (-25, 7.9, -9.55),
        (25, 32.1, 4.45),
        (-1, 32.1, 4.45),
        (-23, 32.1, 4.45),
        (1, 32.1, 4.45),
        (23, 32.1, 4.45),
        (-25, 32.1, 4.45),
        (25, 22.95, 2.4),
        (-1, 22.95, 2.4),
        (-23, 22.95, 2.4),
        (1, 22.95, 2.4),
        (23, 22.95, 2.4),
        (-25, 22.95, 2.4),
    ]]
    fillet(verrundung5_edges, radius=VERRUNDUNG5_R)


solid = part.part
